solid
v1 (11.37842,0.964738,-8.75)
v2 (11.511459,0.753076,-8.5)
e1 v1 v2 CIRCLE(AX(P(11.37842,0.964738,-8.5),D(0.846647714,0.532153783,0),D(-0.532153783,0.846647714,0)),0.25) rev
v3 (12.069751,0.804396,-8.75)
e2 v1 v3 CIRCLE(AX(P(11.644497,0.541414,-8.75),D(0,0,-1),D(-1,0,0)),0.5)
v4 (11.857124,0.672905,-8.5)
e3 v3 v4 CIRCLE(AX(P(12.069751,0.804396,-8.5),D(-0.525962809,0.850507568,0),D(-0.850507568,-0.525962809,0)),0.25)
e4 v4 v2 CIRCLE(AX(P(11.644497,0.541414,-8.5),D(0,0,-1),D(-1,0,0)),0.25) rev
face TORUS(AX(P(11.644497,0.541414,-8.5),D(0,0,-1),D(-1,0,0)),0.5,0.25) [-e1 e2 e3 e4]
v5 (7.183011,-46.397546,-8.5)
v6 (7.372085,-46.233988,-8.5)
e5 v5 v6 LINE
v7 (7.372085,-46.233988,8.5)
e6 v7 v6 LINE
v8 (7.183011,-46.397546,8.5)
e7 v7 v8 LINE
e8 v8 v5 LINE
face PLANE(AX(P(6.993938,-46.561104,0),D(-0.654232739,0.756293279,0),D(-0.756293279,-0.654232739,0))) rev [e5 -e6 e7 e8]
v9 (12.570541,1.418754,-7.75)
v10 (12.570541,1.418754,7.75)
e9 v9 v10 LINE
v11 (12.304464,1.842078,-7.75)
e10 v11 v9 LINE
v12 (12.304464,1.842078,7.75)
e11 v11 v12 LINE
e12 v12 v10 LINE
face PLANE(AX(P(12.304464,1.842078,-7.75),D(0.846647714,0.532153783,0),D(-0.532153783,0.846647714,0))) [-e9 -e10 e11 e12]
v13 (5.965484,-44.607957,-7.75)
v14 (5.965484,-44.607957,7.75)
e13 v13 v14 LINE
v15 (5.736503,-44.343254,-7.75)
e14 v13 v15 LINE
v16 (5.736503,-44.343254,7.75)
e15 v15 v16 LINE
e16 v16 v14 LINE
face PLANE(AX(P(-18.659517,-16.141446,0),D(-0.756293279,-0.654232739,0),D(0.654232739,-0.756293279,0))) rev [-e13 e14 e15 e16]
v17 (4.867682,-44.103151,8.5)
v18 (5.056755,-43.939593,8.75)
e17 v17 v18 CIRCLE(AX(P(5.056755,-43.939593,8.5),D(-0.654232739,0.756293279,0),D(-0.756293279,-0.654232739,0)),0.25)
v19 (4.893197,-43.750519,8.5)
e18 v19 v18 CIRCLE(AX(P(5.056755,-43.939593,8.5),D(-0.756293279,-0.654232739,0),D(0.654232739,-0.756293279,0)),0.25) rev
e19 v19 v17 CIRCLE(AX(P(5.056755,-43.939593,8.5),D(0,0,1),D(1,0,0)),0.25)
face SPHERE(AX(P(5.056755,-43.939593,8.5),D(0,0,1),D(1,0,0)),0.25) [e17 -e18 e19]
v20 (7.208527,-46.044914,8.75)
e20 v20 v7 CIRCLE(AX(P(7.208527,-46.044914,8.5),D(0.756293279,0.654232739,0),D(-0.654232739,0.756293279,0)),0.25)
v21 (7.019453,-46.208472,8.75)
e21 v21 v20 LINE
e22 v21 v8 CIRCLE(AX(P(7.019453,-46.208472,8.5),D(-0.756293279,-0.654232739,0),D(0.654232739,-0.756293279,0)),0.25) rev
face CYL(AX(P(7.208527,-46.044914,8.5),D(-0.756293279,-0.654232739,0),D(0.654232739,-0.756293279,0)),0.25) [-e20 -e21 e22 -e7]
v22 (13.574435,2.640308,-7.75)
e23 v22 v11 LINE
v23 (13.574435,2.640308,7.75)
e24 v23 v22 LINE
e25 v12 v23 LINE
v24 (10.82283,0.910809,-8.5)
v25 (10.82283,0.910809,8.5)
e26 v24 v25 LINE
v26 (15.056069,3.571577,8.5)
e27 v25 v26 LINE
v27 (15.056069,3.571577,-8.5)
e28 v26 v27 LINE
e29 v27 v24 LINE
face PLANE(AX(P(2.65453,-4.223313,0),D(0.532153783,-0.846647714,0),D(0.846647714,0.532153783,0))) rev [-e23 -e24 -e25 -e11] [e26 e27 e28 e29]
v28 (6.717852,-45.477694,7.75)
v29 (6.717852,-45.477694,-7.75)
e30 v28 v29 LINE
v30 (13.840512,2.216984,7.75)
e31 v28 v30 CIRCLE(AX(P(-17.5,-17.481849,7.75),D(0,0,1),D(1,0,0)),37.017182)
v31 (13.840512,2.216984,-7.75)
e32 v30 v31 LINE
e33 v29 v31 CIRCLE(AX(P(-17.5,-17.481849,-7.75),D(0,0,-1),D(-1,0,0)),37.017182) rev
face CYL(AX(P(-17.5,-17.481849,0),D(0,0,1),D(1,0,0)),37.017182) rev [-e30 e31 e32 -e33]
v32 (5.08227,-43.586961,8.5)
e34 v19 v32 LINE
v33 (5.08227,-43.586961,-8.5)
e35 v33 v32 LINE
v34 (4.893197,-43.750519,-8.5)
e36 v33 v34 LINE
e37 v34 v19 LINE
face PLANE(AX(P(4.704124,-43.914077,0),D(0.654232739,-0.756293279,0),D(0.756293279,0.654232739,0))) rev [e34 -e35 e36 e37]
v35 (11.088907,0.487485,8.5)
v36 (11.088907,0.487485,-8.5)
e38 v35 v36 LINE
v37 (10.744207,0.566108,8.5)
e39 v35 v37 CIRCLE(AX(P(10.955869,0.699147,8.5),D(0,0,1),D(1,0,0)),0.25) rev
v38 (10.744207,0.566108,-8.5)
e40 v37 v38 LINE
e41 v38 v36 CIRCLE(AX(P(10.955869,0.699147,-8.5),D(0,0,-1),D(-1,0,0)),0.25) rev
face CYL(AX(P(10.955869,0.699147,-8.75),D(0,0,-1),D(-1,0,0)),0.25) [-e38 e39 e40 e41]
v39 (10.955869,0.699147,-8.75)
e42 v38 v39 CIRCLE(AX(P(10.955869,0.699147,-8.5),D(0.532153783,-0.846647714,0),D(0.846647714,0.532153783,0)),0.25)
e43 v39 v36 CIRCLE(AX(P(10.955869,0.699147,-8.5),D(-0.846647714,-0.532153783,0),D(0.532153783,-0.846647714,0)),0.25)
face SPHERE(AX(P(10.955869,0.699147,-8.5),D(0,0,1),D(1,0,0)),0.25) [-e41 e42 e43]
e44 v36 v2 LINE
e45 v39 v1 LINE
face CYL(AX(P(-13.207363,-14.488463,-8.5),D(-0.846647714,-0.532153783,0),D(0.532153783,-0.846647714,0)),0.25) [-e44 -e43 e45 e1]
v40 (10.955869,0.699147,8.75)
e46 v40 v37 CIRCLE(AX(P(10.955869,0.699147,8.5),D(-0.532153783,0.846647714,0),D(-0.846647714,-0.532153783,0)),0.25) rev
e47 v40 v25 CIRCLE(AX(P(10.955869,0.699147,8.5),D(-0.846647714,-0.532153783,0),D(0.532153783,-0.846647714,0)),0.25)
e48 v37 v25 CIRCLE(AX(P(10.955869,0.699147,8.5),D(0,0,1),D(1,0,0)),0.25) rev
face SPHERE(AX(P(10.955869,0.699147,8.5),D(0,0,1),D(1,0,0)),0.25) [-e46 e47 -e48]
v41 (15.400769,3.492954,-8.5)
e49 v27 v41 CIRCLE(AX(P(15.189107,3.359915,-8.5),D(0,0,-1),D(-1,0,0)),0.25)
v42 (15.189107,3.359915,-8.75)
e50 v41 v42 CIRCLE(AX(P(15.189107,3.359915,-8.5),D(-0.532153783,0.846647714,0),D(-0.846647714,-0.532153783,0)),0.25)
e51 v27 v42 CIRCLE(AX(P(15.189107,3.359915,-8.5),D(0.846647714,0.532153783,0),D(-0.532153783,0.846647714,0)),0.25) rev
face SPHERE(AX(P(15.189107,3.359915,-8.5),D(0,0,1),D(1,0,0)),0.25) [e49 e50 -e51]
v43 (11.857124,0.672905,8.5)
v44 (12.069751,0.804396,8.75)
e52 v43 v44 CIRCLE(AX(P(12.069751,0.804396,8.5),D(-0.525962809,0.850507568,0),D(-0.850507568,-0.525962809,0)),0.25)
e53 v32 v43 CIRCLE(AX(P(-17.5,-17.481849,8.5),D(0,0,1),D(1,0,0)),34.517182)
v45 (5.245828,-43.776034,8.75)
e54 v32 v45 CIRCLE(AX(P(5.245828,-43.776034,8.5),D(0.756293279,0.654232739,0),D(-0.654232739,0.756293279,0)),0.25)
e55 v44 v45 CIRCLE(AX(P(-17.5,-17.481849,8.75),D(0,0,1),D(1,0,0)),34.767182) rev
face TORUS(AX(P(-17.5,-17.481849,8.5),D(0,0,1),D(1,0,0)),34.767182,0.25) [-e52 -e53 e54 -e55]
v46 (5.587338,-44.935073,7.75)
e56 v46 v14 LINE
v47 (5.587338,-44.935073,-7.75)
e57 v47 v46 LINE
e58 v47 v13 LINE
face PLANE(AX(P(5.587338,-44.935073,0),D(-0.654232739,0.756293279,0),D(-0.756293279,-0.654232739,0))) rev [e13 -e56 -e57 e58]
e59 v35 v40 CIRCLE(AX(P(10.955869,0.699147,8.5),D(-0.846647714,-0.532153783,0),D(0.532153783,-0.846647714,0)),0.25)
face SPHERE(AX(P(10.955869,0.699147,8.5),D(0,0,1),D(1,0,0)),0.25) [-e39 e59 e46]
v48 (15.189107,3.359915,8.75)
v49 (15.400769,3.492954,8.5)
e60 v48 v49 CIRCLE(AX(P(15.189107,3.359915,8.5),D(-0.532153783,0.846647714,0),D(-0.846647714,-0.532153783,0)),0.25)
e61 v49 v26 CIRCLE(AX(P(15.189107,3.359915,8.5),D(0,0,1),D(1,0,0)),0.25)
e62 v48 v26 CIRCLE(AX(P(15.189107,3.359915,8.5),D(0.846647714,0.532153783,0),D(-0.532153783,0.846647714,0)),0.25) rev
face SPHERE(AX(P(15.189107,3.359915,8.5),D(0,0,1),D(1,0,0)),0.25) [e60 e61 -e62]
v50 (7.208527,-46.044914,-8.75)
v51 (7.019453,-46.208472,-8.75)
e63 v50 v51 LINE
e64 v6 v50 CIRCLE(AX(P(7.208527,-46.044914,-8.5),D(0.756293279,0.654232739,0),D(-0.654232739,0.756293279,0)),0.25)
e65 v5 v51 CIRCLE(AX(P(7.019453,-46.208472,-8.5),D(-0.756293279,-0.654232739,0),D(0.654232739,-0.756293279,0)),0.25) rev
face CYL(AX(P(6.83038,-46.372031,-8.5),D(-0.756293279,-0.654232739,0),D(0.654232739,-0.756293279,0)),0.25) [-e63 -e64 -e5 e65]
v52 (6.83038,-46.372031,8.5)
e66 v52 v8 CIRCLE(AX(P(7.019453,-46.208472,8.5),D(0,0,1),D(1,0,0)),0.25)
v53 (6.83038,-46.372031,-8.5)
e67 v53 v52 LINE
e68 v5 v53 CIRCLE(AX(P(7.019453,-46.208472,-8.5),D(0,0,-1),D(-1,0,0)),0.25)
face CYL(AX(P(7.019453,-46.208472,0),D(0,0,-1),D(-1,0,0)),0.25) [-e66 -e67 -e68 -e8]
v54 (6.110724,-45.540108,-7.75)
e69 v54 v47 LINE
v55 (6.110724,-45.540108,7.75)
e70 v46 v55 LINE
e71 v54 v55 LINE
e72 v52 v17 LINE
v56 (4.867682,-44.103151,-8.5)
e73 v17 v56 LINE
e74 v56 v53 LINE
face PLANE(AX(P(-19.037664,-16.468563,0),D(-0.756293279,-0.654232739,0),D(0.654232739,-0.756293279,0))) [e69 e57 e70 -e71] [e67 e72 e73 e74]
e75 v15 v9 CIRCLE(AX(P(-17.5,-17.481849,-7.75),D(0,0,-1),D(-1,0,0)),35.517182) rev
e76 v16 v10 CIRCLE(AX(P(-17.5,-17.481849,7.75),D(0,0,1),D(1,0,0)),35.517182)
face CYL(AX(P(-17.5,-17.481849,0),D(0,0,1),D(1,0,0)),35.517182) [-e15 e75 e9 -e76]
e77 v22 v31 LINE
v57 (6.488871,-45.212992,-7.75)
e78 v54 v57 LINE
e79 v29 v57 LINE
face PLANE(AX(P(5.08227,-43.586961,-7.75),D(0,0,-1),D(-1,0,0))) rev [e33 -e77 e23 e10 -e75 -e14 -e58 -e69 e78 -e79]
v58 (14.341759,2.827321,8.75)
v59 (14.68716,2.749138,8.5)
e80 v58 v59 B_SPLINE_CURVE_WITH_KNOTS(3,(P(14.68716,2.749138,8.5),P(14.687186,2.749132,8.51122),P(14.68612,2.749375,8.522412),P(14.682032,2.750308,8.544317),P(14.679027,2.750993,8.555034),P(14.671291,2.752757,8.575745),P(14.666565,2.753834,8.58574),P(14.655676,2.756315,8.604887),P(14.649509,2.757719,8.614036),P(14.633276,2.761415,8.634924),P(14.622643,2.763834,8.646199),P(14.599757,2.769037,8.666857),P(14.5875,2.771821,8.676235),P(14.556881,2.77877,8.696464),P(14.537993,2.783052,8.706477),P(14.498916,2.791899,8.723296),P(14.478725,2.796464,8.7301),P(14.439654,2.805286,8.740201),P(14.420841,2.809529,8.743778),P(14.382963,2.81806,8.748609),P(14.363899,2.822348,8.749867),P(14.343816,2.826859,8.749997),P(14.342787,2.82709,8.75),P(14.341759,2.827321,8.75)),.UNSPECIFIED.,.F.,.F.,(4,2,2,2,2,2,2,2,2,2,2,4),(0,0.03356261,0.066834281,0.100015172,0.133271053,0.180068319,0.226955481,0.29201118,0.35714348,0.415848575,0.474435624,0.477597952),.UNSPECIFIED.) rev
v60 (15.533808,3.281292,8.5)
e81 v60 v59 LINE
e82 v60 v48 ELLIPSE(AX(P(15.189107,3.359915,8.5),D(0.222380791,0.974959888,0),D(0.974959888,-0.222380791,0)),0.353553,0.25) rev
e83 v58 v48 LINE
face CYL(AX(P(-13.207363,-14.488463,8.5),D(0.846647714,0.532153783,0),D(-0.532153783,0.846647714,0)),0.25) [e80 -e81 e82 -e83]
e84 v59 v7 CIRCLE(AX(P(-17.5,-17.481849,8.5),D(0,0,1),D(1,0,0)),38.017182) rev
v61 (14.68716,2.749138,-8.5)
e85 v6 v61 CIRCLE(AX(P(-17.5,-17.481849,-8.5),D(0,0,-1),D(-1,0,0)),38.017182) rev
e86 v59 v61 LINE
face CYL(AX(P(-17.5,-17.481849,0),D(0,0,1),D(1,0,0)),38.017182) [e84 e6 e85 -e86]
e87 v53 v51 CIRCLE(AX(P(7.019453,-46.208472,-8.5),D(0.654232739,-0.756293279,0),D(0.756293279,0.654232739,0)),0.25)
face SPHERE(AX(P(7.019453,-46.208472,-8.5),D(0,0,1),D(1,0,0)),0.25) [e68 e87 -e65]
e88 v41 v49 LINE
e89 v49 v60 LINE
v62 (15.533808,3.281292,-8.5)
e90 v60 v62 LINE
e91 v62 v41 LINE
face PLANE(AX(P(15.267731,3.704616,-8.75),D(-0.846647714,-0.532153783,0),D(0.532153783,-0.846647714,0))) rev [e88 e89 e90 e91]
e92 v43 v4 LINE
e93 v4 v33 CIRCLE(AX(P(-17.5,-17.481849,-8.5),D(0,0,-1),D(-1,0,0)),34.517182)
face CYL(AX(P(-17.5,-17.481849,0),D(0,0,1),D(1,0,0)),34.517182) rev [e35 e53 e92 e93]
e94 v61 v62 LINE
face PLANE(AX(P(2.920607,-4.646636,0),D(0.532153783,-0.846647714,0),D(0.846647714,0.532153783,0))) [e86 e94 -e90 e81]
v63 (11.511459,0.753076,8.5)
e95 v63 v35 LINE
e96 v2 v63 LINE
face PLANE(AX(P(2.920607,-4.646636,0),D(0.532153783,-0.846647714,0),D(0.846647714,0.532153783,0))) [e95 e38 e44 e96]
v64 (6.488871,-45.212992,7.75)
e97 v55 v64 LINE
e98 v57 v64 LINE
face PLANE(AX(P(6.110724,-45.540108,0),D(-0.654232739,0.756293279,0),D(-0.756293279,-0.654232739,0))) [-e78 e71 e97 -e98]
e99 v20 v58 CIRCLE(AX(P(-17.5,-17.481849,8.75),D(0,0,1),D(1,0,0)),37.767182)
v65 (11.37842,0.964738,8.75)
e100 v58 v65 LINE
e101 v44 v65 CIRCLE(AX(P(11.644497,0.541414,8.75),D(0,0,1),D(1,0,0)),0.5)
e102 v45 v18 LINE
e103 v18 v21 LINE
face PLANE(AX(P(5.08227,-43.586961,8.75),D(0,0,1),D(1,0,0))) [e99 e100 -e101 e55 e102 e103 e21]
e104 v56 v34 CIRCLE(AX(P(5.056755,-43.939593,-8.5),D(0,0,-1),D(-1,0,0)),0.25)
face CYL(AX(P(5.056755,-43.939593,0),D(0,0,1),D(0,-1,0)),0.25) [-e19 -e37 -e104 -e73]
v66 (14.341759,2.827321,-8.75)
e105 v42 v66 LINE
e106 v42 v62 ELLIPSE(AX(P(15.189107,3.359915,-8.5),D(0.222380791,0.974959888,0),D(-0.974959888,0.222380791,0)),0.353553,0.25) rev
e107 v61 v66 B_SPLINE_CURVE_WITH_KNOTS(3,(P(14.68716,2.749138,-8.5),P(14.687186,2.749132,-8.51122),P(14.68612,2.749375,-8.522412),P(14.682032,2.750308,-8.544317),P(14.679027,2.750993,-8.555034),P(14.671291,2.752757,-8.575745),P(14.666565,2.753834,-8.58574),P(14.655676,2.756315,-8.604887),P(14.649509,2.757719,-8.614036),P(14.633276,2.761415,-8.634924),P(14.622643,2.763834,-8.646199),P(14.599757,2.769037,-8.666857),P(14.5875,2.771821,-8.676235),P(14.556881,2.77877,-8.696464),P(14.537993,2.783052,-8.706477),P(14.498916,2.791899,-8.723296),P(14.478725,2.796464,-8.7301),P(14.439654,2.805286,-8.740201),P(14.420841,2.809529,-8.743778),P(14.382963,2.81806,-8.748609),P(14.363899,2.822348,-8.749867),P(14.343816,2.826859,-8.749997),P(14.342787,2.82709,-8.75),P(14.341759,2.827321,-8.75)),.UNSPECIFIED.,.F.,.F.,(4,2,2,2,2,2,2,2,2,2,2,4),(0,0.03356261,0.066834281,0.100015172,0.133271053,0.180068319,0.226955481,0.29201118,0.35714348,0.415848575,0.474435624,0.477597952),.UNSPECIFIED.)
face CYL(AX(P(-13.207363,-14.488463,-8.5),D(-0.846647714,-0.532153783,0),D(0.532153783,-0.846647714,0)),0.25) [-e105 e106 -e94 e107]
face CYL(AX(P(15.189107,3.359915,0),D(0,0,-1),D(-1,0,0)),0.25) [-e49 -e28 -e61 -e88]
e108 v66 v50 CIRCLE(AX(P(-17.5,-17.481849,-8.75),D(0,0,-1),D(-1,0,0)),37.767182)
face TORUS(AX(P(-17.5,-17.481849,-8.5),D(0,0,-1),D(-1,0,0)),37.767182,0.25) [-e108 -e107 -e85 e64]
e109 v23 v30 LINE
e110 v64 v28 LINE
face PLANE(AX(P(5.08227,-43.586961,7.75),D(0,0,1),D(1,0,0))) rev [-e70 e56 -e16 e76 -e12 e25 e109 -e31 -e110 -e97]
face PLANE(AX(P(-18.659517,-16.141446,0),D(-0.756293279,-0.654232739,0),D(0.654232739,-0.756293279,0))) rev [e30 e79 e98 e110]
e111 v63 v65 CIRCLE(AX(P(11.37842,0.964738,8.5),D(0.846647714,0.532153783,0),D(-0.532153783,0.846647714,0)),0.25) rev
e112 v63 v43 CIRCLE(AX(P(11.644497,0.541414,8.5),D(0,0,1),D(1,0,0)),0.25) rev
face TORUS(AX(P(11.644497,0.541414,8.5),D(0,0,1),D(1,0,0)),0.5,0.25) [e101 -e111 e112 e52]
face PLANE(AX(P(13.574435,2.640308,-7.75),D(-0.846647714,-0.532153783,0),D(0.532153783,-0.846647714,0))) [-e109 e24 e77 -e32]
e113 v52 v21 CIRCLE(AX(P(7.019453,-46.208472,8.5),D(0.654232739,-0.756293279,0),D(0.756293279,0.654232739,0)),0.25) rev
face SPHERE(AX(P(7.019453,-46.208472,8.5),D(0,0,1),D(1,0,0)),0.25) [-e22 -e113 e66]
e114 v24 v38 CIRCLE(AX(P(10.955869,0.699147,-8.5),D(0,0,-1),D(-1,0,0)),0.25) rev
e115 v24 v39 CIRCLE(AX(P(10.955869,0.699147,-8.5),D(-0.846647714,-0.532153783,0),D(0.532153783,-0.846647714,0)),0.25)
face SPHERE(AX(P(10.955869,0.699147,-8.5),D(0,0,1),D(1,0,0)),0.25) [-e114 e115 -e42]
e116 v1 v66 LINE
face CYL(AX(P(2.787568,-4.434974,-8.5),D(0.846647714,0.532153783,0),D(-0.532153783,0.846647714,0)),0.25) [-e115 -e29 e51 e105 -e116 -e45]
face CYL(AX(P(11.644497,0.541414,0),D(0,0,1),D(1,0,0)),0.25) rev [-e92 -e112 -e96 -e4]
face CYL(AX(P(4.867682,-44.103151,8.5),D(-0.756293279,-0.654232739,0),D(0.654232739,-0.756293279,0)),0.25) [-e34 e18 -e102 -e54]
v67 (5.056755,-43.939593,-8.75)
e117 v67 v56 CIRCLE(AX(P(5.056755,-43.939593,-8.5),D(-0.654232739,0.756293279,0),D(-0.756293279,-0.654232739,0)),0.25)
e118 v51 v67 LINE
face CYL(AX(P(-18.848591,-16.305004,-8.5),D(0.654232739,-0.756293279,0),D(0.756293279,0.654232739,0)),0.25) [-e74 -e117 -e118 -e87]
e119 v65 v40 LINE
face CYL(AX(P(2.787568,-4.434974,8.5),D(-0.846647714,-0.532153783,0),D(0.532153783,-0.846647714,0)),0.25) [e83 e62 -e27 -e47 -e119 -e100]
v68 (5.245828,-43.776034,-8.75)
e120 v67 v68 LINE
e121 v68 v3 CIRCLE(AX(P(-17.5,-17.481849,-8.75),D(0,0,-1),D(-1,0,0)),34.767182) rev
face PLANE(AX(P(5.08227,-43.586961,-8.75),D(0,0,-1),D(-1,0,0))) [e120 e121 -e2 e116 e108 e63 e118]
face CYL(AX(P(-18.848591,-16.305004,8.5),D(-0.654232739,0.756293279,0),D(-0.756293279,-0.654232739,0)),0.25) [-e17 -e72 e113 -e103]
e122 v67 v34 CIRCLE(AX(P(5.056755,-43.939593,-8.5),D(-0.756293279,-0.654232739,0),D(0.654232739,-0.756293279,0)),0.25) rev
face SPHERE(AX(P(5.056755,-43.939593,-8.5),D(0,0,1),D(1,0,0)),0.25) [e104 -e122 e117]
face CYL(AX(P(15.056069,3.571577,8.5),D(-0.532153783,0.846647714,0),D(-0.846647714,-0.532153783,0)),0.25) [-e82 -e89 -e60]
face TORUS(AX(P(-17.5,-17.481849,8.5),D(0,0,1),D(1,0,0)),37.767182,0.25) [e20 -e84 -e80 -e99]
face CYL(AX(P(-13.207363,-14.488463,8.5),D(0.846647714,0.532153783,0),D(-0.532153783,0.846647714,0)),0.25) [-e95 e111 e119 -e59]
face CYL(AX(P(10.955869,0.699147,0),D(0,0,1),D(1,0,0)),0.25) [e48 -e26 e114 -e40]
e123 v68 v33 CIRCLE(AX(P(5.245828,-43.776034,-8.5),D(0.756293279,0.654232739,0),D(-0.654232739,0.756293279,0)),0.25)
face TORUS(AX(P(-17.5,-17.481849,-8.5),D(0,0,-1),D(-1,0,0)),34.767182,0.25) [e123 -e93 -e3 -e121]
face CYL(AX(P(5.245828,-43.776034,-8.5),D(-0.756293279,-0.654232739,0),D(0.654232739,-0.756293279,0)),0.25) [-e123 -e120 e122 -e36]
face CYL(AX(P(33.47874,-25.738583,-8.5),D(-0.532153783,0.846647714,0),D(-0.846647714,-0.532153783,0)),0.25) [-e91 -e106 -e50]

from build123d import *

# Parameters (mm, degrees)
SKETCH10_W          = 3.5
SKETCH10_H          = 17.5
SHELL1_T            = -1
SKETCH11_W          = 5.5
SKETCH11_H          = 17.5
SKETCH11_W_2        = 1.5
SKETCH11_H_2        = 15.5
BOSS_EXTRUDE1_DEPTH = 0.5
SKETCH12_W          = 15.5
SKETCH12_H          = 0.35
SKETCH12_W_2        = 1
SKETCH12_H_2        = 0.8
BOSS_EXTRUDE2_DEPTH = 0.5
FILLET1_R           = 0.25


with BuildPart() as part:
    # Sweep1: sweep along a path in Sketch7
    with BuildLine(Plane.XY) as sweep1_path:
        ThreePointArc((11.723892809, 0.886599981), (16.638600451, -22.580062041), (5.082270205, -43.586961119))
    # Sketch10 → Sweep1 (sweep)
    with BuildSketch(Plane(origin=(0, -17.481848747, 0), x_dir=(1, 0, 0), z_dir=(0, 1, 0))):
        with Locations((18.767181512, 0)):
            Rectangle(SKETCH10_W, SKETCH10_H)
    sweep(path=sweep1_path.line)

    # Shell1
    shell1_openings = [part.faces().sort_by_distance(p)[0] for p in [
        (6.227177499, -44.910474357, 0),
        (13.205526307, 1.817869101, 0),
    ]]
    offset(amount=SHELL1_T, openings=shell1_openings, kind=Kind.INTERSECTION)

    # Sketch11 → Boss-Extrude1 (add)
    with BuildSketch(Plane(origin=(2.920606872, -4.646636383, 0), x_dir=(0.8466477136319881, 0.5321537832259836, 0), z_dir=(-0.5321537832259836, 0.8466477136319881, 0))):
        with Locations((12.147814575, 0)):
            Rectangle(SKETCH11_W, SKETCH11_H)
        with Locations((12.147814575, 0)):
            Rectangle(SKETCH11_W_2, SKETCH11_H_2, mode=Mode.SUBTRACT)
    extrude(amount=BOSS_EXTRUDE1_DEPTH)

    # Sketch12 → Boss-Extrude2 (add)
    with BuildSketch(Plane(origin=(-18.659517469, -16.141446142, 0), x_dir=(0, 0, 1), z_dir=(-0.7562932785342891, -0.654232739049229, 0))):
        Polygon((-7.75, -38.439513283), (-8.75, -38.439513283), (-8.75, -39.789513283), (8.75, -39.789513283), (8.75, -38.439513283), (7.75, -38.439513283), (7.75, -38.789513283), (-7.75, -38.789513283), align=None)
        with Locations((0, -38.614513283)):
            Rectangle(SKETCH12_W, SKETCH12_H)
        Polygon((8.75, -36.289513283), (-8.75, -36.289513283), (-8.75, -37.639513283), (-7.75, -37.639513283), (-7.75, -37.289513283), (7.75, -37.289513283), (7.75, -37.639513283), (8.75, -37.639513283), align=None)
        with Locations((0, -37.464513283)):
            Rectangle(SKETCH12_W, SKETCH12_H)
        with Locations((8.25, -38.039513283)):
            Rectangle(SKETCH12_W_2, SKETCH12_H_2)
        with Locations((-8.25, -38.039513283)):
            Rectangle(SKETCH12_W_2, SKETCH12_H_2)
    extrude(amount=BOSS_EXTRUDE2_DEPTH)

    # Fillet1
    fillet1_edges = [part.edges().sort_by_distance(p)[0] for p in [
        (16.638600451, -22.580062041, -8.75),
        (16.638600451, -22.580062041, 8.75),
        (20.100212795, -23.097014635, 8.75),
        (20.100212795, -23.097014635, -8.75),
        (15.267730628, 3.704615862, 0),
        (12.939449416, 2.241192958, -8.75),
        (10.611168203, 0.777770054, 0),
        (12.939449416, 2.241192958, 8.75),
        (15.400769074, 3.492953934, 8.75),
        (15.110483663, 3.015215114, -8.75),
        (11.300568952, 0.620523089, -8.75),
        (15.400769074, 3.492953934, -8.75),
        (10.877245095, 0.354446198, 0),
        (10.744206649, 0.566108126, -8.75),
        (11.300568952, 0.620523089, 8.75),
        (15.110483663, 3.015215114, 8.75),
        (10.744206649, 0.566108126, 8.75),
        (11.723892809, 0.886599981, 0),
        (4.893196886, -43.750519304, 8.75),
        (4.893196886, -43.750519304, -8.75),
        (7.183011472, -46.397545779, -8.75),
        (7.183011472, -46.397545779, 8.75),
        (4.704123566, -43.914077489, 0),
        (5.849030859, -45.237590726, -8.75),
        (6.993938153, -46.561103964, 0),
        (5.849030859, -45.237590726, 8.75),
    ]]
    fillet(fillet1_edges, radius=FILLET1_R - 0.0001)  # a hair under: the kernel refuses the full size


solid = part.part
